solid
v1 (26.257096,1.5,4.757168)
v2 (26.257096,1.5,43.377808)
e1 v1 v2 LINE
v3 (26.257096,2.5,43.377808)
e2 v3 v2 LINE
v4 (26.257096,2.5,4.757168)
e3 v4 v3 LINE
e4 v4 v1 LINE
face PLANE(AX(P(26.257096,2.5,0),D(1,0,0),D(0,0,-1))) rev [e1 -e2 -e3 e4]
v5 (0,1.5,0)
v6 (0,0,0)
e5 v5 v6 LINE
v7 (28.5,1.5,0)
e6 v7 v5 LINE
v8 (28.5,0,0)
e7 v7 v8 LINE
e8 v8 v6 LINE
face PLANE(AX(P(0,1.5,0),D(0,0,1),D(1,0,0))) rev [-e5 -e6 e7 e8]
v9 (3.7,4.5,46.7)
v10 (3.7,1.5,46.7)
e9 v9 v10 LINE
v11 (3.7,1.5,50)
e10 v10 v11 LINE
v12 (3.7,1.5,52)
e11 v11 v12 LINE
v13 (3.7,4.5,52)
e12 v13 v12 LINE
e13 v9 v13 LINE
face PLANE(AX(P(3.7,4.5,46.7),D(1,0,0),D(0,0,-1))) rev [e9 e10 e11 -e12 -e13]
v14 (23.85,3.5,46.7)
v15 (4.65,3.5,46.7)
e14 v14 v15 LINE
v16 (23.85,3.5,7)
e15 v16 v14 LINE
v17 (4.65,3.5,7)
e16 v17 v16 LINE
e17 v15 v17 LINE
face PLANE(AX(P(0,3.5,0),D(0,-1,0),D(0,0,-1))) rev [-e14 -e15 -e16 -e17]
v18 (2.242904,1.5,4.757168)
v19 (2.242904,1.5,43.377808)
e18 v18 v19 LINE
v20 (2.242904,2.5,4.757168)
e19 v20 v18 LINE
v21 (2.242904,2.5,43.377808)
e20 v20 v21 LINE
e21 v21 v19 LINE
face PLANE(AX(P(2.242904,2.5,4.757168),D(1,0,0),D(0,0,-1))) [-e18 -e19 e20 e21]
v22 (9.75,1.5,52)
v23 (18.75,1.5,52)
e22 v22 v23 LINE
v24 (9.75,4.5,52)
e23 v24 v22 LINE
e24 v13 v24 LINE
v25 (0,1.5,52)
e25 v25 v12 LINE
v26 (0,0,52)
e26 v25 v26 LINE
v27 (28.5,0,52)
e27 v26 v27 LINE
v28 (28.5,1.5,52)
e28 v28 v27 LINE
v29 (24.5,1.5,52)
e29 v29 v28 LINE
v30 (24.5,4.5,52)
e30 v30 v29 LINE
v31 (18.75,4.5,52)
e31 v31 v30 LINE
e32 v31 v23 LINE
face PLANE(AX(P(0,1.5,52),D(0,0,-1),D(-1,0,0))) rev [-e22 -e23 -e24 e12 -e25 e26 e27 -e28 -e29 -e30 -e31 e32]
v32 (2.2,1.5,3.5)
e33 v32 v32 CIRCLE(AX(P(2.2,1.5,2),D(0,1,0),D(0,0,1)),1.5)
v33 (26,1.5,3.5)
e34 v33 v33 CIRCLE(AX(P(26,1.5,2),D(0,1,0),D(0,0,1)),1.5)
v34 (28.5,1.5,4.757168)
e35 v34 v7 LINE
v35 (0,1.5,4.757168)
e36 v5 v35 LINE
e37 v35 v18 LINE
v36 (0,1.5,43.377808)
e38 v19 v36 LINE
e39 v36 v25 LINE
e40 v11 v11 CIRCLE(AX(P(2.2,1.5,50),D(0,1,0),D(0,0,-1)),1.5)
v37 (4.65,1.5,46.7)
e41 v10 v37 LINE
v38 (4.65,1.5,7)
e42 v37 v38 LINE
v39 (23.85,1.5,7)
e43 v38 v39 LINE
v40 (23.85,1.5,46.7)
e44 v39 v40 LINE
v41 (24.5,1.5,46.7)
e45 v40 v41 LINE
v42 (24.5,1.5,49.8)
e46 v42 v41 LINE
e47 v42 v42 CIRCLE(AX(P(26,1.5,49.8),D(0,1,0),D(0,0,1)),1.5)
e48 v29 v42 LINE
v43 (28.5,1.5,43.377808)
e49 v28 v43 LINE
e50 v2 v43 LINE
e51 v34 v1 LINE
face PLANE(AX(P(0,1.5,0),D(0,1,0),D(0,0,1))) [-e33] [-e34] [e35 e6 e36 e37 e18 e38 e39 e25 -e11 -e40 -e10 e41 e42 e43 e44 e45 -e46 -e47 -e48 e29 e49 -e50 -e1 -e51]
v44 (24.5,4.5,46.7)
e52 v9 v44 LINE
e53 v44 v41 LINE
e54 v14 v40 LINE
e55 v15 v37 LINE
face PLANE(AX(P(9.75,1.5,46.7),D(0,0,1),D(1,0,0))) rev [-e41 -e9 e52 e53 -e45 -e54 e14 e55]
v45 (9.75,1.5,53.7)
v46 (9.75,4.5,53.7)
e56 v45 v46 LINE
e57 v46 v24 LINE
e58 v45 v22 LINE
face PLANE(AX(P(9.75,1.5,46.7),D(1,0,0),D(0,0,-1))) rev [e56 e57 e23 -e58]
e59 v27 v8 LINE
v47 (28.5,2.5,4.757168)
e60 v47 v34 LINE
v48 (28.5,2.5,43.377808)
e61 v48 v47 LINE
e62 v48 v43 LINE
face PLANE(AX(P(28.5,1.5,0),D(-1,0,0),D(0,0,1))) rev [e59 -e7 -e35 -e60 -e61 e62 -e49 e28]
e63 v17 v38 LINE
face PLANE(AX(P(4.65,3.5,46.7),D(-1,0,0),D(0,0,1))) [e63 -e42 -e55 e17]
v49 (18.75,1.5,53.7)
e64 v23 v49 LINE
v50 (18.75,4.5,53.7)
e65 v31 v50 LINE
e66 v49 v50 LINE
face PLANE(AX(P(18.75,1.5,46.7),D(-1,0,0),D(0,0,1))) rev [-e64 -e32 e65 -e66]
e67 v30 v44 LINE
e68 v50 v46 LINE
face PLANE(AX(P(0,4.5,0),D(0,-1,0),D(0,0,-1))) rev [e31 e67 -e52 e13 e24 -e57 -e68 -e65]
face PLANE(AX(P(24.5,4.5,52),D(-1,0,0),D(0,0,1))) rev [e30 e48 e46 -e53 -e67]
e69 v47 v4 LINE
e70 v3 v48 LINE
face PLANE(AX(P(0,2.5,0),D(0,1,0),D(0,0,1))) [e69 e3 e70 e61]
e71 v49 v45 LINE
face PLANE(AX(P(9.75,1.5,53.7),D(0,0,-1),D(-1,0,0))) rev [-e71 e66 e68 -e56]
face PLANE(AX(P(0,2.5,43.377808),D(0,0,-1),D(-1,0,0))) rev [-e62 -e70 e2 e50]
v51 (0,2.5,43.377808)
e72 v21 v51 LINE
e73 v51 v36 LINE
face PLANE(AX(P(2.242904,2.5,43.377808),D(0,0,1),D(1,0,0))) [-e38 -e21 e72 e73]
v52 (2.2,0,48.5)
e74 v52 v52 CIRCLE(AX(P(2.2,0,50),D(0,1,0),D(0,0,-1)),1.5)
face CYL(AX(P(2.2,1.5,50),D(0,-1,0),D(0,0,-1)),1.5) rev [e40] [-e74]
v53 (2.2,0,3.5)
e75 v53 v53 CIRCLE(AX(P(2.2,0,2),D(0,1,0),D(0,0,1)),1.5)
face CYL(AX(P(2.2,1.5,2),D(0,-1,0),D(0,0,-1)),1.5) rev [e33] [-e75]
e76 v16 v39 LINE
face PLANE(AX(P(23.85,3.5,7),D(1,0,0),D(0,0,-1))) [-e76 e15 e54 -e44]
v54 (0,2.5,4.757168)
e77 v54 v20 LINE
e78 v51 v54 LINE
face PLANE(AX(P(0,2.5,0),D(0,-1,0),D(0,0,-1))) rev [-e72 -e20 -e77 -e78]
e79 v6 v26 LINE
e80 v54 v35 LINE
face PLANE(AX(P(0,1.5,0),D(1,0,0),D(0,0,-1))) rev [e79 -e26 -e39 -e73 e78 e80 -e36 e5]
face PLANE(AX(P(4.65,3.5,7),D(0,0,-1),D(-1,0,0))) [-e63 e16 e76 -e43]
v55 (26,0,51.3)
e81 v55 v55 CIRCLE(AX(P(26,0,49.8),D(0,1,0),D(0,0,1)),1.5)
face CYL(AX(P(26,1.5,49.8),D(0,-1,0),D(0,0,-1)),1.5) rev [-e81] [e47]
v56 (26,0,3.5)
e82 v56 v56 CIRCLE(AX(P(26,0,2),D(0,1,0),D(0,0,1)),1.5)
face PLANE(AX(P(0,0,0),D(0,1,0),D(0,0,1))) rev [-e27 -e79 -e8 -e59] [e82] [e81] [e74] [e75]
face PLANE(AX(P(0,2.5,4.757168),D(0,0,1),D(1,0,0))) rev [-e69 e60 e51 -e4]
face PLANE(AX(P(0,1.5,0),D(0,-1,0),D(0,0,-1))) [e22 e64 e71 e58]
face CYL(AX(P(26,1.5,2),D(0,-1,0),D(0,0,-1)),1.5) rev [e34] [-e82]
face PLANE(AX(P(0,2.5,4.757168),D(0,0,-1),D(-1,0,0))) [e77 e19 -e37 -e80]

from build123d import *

# Parameters (mm, degrees)
SKETCH_2_W            = 28.5
SKETCH_2_H            = 52
SKETCH_2_R            = 1.5
EXTRUDE_1_DEPTH       = 1.5
EXTRUDE_START         = 4.65
EXTRUDE_2_DEPTH       = 19.2
EXTRUDE_2_2_OUTLINE_W = 1
EXTRUDE_2_2_OUTLINE_H = 38.620640838
EXTRUDE_2_2_DEPTH     = 2.24290402
EXTRUDE_START_2       = 26.25709598
EXTRUDE_2_3_OUTLINE_W = 1
EXTRUDE_2_3_OUTLINE_H = 38.620640838
EXTRUDE_2_3_DEPTH     = 2.24290402
EXTRUDE_START_3       = 9.75
EXTRUDE_2_4_OUTLINE_W = 3
EXTRUDE_2_4_OUTLINE_H = 1.7
EXTRUDE_2_4_DEPTH     = 9
EXTRUDE_START_4       = 3.7
EXTRUDE_2_5_OUTLINE_W = 3
EXTRUDE_2_5_OUTLINE_H = 5.3
EXTRUDE_2_5_DEPTH     = 20.8


# Read off the part's stored shape, not the designer's step: Бобышка-Вытянуть2
with BuildPart() as part:
    # Эскиз2 → Бобышка-Вытянуть1 (new body)
    with BuildSketch(Plane(origin=(0, 0, 0), x_dir=(1, 0, 0), z_dir=(0, 1, 0))):
        with Locations((14.25, -26)):
            Rectangle(SKETCH_2_W, SKETCH_2_H)
        with Locations(Location((2.2, -2, 0), (0, 0, 270))):
            Circle(SKETCH_2_R, mode=Mode.SUBTRACT)
        with Locations(Location((26, -2, 0), (0, 0, 270))):
            Circle(SKETCH_2_R, mode=Mode.SUBTRACT)
        with Locations(Location((2.2, -50, 0), (0, 0, 90))):
            Circle(SKETCH_2_R, mode=Mode.SUBTRACT)
        with Locations(Location((26, -49.8, 0), (0, 0, 270))):
            Circle(SKETCH_2_R, mode=Mode.SUBTRACT)
    extrude(amount=EXTRUDE_1_DEPTH)

    # Бобышка-Вытянуть2 outline → Бобышка-Вытянуть2 (add)
    with BuildSketch(Plane.YZ.offset(EXTRUDE_START)):
        Polygon((4.5, 52), (1.5, 52), (1.5, 7), (3.5, 7), (3.5, 46.7), (4.5, 46.7), align=None)
    extrude(amount=EXTRUDE_2_DEPTH)

    # Extrude 2 2 outline → Extrude 2 2 (add)
    with BuildSketch(Plane.YZ):
        with Locations((2, 24.067488006)):
            Rectangle(EXTRUDE_2_2_OUTLINE_W, EXTRUDE_2_2_OUTLINE_H)
    extrude(amount=EXTRUDE_2_2_DEPTH)

    # Extrude 2 3 outline → Extrude 2 3 (add)
    with BuildSketch(Plane.YZ.offset(EXTRUDE_START_2)):
        with Locations((2, 24.067488006)):
            Rectangle(EXTRUDE_2_3_OUTLINE_W, EXTRUDE_2_3_OUTLINE_H)
    extrude(amount=EXTRUDE_2_3_DEPTH)

    # Extrude 2 4 outline → Extrude 2 4 (add)
    with BuildSketch(Plane.YZ.offset(EXTRUDE_START_3)):
        with Locations((3, 52.85)):
            Rectangle(EXTRUDE_2_4_OUTLINE_W, EXTRUDE_2_4_OUTLINE_H)
    extrude(amount=EXTRUDE_2_4_DEPTH)

    # Extrude 2 5 outline → Extrude 2 5 (add)
    with BuildSketch(Plane.YZ.offset(EXTRUDE_START_4)):
        with Locations((3, 49.35)):
            Rectangle(EXTRUDE_2_5_OUTLINE_W, EXTRUDE_2_5_OUTLINE_H)
    extrude(amount=EXTRUDE_2_5_DEPTH)


solid = part.part
